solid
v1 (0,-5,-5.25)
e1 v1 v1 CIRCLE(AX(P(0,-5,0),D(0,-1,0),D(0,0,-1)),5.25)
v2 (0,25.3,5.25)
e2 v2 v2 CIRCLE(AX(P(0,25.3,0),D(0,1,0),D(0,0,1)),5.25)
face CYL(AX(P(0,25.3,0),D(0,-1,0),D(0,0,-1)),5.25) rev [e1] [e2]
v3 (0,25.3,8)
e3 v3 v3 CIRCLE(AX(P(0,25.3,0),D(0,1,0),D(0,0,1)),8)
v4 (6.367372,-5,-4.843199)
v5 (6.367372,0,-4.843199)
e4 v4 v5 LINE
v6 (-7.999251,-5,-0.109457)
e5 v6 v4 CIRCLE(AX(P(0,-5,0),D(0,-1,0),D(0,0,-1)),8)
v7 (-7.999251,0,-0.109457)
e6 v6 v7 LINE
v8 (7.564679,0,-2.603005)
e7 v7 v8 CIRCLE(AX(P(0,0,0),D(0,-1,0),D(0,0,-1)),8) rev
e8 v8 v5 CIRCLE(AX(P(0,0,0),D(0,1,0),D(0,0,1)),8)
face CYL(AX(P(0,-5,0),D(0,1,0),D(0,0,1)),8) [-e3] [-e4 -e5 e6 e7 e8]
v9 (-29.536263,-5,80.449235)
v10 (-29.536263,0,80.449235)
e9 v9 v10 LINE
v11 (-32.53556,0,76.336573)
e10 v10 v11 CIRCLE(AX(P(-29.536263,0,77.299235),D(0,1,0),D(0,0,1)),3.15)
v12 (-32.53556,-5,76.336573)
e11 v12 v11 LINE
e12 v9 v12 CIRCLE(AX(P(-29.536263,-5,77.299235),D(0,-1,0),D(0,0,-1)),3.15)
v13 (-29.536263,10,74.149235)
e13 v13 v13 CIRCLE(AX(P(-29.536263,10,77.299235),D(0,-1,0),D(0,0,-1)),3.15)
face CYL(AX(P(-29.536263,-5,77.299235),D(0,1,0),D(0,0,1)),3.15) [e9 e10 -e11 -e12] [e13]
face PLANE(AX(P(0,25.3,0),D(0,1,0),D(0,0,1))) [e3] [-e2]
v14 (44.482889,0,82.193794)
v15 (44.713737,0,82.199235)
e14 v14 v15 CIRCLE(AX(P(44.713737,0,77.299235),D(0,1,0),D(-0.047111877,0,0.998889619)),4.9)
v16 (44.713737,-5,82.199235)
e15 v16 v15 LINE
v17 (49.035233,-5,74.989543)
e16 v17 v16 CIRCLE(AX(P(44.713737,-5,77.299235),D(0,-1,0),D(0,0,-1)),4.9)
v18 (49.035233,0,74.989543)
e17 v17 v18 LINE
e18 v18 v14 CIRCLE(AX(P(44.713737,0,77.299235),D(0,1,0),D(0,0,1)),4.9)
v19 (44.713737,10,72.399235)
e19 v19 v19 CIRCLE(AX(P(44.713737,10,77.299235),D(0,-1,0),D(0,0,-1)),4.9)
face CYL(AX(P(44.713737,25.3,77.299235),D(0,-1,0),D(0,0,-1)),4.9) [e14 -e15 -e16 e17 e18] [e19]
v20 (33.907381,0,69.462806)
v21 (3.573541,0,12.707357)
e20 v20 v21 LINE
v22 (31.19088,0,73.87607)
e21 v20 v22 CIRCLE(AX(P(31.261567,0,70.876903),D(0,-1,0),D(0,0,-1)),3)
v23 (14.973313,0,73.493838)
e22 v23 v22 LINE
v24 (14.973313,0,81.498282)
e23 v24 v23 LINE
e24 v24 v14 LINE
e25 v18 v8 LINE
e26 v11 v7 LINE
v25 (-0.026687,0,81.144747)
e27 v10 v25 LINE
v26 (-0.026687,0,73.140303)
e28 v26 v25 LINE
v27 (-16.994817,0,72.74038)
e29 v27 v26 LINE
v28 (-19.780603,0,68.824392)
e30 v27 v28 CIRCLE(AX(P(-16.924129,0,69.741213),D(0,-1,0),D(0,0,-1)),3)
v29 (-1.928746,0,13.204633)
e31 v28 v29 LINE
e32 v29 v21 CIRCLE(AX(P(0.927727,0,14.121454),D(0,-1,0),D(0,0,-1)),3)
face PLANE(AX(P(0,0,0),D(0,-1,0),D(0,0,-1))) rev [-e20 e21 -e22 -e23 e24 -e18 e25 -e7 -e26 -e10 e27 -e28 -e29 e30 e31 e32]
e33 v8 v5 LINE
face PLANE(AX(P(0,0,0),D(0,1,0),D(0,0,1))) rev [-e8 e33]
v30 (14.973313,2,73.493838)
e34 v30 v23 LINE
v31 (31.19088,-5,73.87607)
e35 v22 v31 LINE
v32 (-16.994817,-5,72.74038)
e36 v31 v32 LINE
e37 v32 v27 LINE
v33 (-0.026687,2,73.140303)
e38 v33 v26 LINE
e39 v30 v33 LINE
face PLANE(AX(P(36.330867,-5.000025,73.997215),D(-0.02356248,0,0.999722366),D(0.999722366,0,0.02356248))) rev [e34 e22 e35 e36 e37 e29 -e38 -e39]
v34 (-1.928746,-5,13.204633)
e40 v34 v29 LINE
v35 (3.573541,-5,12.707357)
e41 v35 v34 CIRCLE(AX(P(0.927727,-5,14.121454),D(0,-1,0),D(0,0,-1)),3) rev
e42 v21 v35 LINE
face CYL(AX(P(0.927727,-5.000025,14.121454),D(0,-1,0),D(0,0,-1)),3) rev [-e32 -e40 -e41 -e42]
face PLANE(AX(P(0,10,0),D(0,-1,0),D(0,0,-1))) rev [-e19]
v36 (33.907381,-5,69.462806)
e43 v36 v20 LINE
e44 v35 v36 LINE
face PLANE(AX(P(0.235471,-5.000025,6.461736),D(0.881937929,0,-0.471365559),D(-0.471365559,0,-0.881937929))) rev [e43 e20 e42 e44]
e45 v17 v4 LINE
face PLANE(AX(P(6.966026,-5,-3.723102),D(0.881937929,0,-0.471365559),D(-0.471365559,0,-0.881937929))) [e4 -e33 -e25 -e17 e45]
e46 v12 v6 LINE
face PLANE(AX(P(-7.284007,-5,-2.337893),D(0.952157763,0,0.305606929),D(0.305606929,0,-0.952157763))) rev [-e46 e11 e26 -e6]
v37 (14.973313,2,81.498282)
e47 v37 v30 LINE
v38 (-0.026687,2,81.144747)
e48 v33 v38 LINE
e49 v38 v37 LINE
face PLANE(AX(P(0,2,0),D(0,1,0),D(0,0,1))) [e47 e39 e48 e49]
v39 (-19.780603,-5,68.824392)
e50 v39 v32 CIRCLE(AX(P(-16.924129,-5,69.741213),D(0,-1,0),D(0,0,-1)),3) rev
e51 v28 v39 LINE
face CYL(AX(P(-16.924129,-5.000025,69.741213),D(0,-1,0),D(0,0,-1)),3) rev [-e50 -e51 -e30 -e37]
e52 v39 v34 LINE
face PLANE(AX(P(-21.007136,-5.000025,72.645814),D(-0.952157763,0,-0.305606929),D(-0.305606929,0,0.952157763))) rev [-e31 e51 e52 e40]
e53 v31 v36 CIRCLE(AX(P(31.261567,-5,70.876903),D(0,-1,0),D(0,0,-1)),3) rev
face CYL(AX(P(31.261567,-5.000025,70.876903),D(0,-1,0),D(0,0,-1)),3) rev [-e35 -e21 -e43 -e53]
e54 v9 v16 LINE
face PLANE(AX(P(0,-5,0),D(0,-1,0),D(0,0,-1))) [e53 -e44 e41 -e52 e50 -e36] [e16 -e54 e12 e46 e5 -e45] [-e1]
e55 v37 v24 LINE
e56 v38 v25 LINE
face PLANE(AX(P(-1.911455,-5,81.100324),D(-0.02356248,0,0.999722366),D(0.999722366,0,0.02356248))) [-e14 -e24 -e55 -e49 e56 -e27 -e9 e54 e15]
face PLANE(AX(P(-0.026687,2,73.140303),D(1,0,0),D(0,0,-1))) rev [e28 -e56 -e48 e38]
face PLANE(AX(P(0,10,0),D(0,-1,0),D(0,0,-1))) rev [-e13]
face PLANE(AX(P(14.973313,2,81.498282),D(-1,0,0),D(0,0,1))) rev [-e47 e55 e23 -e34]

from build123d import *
from build123d.topology import SkipClean

# Parameters (mm, degrees)
SKETCH_1_R          = 4.9
EXTRUDE_1_DEPTH     = 25.3
SKETCH_1_R_2        = 3.15
EXTRUDE_1_2_DEPTH   = 25.3
SKETCH_1_R_3        = 8
SKETCH_1_R_4        = 5.25
EXTRUDE_1_3_DEPTH   = 25.3
EXTRUDE_START       = 5
SKETCH_2_R          = 3.15
EXTRUDE_2_DEPTH     = 5
SKETCH_3_W          = 101.378011207
SKETCH_3_H          = 57.539128355
CUT_EXTRUDE_1_DEPTH = 15.3
CUT_EXTRUDE_2_DEPTH = 100.289108802
FILLET_1_R          = 3
SKETCH_5_R          = 5.25
CUT_EXTRUDE_3_DEPTH = 100.289108802
EXTRUDE_3_DEPTH     = 2


with BuildPart() as part:
    # Эскиз1 → Бобышка-Вытянуть1 (new body)
    with BuildSketch(Plane(origin=(0, 0, 0), x_dir=(1, 0, 0), z_dir=(0, 1, 0))):
        with Locations(Location((44.713737374, -77.299234731, 0), (0, 0, 270))):
            Circle(SKETCH_1_R)
    extrude(amount=EXTRUDE_1_DEPTH)



with BuildPart() as body_2:
    # Эскиз1 → Extrude 1 2 (new body)
    with BuildSketch(Plane(origin=(0, 0, 0), x_dir=(1, 0, 0), z_dir=(0, 1, 0))):
        with Locations(Location((-29.536262626, -77.299234731, 0), (0, 0, 270))):
            Circle(SKETCH_1_R_2)
    extrude(amount=EXTRUDE_1_2_DEPTH)


with BuildPart() as body_3:
    # Эскиз1 → Extrude 1 3 (new body)
    with BuildSketch(Plane(origin=(0, 0, 0), x_dir=(1, 0, 0), z_dir=(0, 1, 0))):
        with Locations(Location((0, 0, 0), (0, 0, 270))):
            Circle(SKETCH_1_R_3)
        with Locations(Location((0, 0, 0), (0, 0, 270))):
            Circle(SKETCH_1_R_4, mode=Mode.SUBTRACT)
    extrude(amount=EXTRUDE_1_3_DEPTH)


with BuildPart() as part_1:
    with SkipClean():  # the faces are left unmerged after this step: merging them gives an invalid solid
        add(part.part)

        add(body_2.part)  # Бобышка-Вытянуть2 merges body 2

        add(body_3.part)  # Бобышка-Вытянуть2 merges body 3
        # Эскиз2 → Бобышка-Вытянуть2 (add)
        with BuildSketch(Plane.XZ.offset(EXTRUDE_START)):
            with BuildLine():
                Line((44.482889179, 82.193793865), (-29.536262626, 80.449234731))
                ThreePointArc((-29.536262626, 80.449234731), (-27.308876266, 79.526621092), (-26.386262626, 77.299234731))
                ThreePointArc((-26.386262626, 77.299234731), (-29.049069338, 74.187138541), (-32.535559579, 76.336572905))
                Line((-32.535559579, 76.336572905), (-7.999251158, -0.109457316))
                ThreePointArc((-7.999251158, -0.109457316), (-2.503564236, -7.598168603), (6.367372109, -4.843198574))
                Line((6.367372109, -4.843198574), (49.035233225, 74.989543494))
                ThreePointArc((49.035233225, 74.989543494), (48.916563034, 79.818412468), (44.713737374, 82.199234731))
                Line((44.713737374, 82.199234731), (44.482889179, 82.193793865))
            make_face()
            with Locations(Location((-29.536262626, 77.299234731, 0), (0, 0, 90))):
                Circle(SKETCH_2_R)
        extrude(amount=-EXTRUDE_2_DEPTH)

    # Эскиз3 → Вырез-Вытянуть1 (cut)
    with SkipClean():  # the faces are left unmerged after this step: merging them gives an invalid solid
        with BuildSketch(Plane(origin=(0, 25.3, 0), x_dir=(1, 0, 0), z_dir=(0, 1, 0))):
            with Locations((10.685297464, -78.742909524)):
                Rectangle(SKETCH_3_W, SKETCH_3_H)
        extrude(amount=-CUT_EXTRUDE_1_DEPTH, mode=Mode.SUBTRACT)

    # Эскиз4 → Вырез-Вытянуть2 (cut, through all)
    with SkipClean():  # the faces are left unmerged after this step: merging them gives an invalid solid
        with BuildSketch(Plane(origin=(0, 0, 0), x_dir=(1, 0, 0), z_dir=(0, 1, 0))):
            Polygon((36.330866648, -73.997214663), (-21.007135718, -72.645813934), (0.235470884, -6.461736097), align=None)
        extrude(amount=-CUT_EXTRUDE_2_DEPTH, mode=Mode.SUBTRACT)

    # Скругление1
    # the kernel refuses this fillet: 3 mm, written as the material it adds along each edge
    with BuildSketch(Plane(origin=(0.235470884, 0, 6.461736097), x_dir=(0.4713655585699632, 0, 0.8819379287648461), z_dir=(0, -1, 0))) as fillet_1_piece_1:
        with BuildLine():
            CenterArc((FILLET_1_R * 2.36056709959, FILLET_1_R), FILLET_1_R, 135.917656387, 134.082343613)
            Line((FILLET_1_R * 1.642226382, FILLET_1_R * 1.69569146426), (0, 0))
            Line((0, 0), (FILLET_1_R * 2.36056709959, 0))
        make_face()
    extrude(amount=5)
    with BuildSketch(Plane(origin=(36.330866648, 0, 73.997214663), x_dir=(-0.4713655585699637, 0, -0.8819379287648459), z_dir=(0, -1, 0))) as fillet_1_piece_2:
        with BuildLine():
            CenterArc((FILLET_1_R * 1.71380475401, -FILLET_1_R), FILLET_1_R, 90, 119.473130073)
            Line((FILLET_1_R * 0.843218222551, -FILLET_1_R * 1.49201533639), (0, 0))
            Line((0, 0), (FILLET_1_R * 1.71380475401, 0))
        make_face()
    extrude(amount=5)
    with BuildSketch(Plane(origin=(-21.007135718, 0, 72.645813934), x_dir=(0.999722366227584, 0, 0.023562480012096054), z_dir=(0, -1, 0))) as fillet_1_piece_3:
        with BuildLine():
            CenterArc((FILLET_1_R * 1.33781102221, -FILLET_1_R), FILLET_1_R, 90, 106.444526314)
            Line((FILLET_1_R * 0.37871675356, -FILLET_1_R * 1.28308688393), (0, 0))
            Line((0, 0), (FILLET_1_R * 1.33781102221, 0))
        make_face()
    extrude(amount=5)

    # Эскиз5 → Вырез-Вытянуть3 (cut, through all)
    with BuildSketch(Plane(origin=(0, 0, 0), x_dir=(1, 0, 0), z_dir=(0, 1, 0))):
        with Locations(Location((0, 0, 0), (0, 0, 90))):
            Circle(SKETCH_5_R)
    extrude(amount=-CUT_EXTRUDE_3_DEPTH, mode=Mode.SUBTRACT)

    # Эскиз6 → Бобышка-Вытянуть3 (add)
    with BuildSketch(Plane(origin=(0, 0, 0), x_dir=(1, 0, 0), z_dir=(0, 1, 0))):
        Polygon((-0.026686724, -73.14030263), (-0.026686724, -81.144746621), (14.973313276, -81.498281975), (14.973313276, -73.493837984), align=None)
    extrude(amount=EXTRUDE_3_DEPTH)


solid = part_1.part
